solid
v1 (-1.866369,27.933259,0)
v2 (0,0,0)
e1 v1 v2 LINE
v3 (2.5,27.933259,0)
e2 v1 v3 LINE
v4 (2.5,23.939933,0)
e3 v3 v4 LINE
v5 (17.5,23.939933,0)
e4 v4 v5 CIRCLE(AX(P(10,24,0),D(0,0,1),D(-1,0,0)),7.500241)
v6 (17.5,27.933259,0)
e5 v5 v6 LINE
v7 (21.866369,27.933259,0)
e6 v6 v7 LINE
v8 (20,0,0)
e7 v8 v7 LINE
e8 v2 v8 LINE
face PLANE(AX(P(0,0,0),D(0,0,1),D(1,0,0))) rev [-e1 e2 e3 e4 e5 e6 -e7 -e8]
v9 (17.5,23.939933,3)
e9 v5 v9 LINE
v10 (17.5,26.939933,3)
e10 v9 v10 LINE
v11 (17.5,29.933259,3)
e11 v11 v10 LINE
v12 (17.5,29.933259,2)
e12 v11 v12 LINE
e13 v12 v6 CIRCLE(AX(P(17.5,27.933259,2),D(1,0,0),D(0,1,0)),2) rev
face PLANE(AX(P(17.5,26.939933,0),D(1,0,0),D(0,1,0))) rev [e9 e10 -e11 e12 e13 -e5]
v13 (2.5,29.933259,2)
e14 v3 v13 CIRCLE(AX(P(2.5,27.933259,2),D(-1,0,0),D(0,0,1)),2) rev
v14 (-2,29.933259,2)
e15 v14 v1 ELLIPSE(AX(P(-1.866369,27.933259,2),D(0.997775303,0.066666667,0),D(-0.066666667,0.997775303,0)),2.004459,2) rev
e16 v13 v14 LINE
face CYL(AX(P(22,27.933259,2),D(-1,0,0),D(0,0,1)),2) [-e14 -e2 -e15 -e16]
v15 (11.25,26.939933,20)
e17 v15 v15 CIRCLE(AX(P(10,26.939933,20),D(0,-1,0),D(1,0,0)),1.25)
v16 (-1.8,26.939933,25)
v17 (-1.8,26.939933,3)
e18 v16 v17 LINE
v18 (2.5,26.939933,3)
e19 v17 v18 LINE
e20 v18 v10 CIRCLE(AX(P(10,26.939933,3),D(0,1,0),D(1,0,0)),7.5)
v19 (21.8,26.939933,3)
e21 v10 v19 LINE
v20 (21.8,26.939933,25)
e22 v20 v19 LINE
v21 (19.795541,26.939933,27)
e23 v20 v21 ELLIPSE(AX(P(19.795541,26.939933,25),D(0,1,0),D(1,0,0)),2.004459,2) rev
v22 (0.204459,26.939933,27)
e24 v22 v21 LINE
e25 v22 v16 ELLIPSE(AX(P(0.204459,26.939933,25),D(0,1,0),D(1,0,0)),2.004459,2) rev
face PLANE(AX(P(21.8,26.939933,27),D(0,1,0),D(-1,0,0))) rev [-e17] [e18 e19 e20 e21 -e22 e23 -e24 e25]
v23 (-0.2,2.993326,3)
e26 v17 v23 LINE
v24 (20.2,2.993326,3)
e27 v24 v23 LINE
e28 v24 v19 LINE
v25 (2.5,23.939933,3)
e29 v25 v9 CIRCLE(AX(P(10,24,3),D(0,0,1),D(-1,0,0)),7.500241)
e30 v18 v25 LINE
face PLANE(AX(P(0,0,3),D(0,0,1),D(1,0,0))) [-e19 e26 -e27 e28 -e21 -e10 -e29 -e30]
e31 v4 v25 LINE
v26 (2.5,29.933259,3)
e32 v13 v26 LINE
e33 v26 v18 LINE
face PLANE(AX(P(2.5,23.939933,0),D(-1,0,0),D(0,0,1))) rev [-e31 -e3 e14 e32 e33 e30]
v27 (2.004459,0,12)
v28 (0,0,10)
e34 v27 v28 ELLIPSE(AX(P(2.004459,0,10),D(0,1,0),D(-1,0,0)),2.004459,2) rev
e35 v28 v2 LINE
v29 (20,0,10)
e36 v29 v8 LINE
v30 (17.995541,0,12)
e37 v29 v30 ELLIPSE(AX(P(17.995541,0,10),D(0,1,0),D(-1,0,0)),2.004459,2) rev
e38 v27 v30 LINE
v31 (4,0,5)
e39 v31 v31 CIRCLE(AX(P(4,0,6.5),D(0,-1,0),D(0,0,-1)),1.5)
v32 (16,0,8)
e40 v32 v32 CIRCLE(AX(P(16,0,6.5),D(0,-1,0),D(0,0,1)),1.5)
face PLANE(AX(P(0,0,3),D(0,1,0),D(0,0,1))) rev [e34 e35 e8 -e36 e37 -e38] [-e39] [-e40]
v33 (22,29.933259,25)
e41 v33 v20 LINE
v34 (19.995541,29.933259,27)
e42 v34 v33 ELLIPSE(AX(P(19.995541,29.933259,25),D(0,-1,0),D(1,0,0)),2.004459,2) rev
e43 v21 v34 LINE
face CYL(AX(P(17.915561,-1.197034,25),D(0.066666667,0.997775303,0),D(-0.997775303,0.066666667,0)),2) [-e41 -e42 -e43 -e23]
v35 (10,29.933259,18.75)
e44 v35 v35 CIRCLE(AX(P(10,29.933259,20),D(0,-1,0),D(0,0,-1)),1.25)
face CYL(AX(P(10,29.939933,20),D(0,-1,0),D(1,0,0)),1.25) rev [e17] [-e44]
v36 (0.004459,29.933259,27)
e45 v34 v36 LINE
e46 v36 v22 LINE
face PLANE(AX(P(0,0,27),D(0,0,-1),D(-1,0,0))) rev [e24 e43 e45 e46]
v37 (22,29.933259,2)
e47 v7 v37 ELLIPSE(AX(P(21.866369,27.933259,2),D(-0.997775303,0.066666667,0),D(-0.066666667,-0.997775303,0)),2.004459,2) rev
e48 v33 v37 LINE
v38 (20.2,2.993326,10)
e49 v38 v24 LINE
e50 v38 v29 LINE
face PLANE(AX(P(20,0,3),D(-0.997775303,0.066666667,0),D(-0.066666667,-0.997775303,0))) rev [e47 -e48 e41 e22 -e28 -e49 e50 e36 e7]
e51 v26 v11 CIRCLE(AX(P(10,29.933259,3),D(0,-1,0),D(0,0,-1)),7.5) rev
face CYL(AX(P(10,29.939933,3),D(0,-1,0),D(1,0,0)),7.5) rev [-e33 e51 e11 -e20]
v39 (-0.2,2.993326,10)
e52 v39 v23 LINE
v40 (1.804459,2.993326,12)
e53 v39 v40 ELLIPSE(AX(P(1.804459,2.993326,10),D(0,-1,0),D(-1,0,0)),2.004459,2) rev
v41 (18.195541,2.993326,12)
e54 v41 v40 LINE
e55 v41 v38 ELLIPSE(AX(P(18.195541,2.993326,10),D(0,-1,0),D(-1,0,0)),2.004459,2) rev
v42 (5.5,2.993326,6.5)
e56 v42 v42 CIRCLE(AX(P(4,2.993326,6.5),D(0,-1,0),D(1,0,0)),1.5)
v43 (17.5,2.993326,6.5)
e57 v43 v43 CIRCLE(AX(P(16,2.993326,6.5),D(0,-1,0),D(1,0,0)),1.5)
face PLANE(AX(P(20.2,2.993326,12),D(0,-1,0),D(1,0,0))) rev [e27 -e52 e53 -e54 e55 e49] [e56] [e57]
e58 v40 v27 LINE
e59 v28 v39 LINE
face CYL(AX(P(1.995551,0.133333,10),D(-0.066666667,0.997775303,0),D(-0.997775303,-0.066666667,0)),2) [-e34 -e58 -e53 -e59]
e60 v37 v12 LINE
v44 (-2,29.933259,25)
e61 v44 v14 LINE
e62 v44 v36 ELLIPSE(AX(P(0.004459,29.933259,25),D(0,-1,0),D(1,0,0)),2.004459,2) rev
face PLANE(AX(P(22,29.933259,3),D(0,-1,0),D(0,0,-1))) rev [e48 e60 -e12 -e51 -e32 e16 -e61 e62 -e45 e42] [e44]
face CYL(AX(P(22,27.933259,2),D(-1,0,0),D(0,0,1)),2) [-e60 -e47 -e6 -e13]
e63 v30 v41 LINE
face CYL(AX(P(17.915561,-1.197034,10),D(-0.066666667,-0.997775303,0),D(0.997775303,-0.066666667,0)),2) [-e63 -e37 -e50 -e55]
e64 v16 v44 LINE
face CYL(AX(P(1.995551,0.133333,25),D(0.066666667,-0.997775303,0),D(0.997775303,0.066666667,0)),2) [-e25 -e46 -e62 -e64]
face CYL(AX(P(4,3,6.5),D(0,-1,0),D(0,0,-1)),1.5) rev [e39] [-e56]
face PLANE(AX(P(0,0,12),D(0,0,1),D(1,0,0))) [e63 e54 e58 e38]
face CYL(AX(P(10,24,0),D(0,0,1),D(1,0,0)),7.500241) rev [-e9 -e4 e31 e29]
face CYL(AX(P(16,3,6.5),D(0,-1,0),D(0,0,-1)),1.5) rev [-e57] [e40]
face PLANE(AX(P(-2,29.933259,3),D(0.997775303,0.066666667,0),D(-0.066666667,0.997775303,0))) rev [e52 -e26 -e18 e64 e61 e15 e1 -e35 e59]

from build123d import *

# Parameters (mm, degrees)
SALIENTE_EXTRUIR1_DEPTH      = 3
SALIENTE_EXTRUIR2_DEPTH      = 9
SALIENTE_EXTRUIR3_DEPTH      = 24
CORTAR_EXTRUIR1_DEPTH        = 3
CORTAR_EXTRUIR_L_MINA1_START = -2.993325909
CORTAR_EXTRUIR_L_MINA1_DEPTH = 2.993325909
REDONDEO1_R                  = 2
CROQUIS6_R                   = 1.25
CORTAR_EXTRUIR2_DEPTH        = 3
CROQUIS7_R                   = 1.5
CORTAR_EXTRUIR3_DEPTH        = 3


# Read off the part's stored shape, not the designer's step: Cortar-Extruir-Lámina1
with BuildPart() as part:
    # Croquis1 → Saliente-Extruir1 (new body)
    with BuildSketch(Plane.XY):
        Polygon((0, 0), (20, 0), (22, 29.933259094), (-2, 29.933259094), align=None)
    extrude(amount=SALIENTE_EXTRUIR1_DEPTH)

    # Croquis2 → Saliente-Extruir2 (add)
    with BuildSketch(Plane.XY.offset(3)):
        Polygon((0, 0), (20, 0), (20.2, 2.993325909), (-0.2, 2.993325909), align=None)
    extrude(amount=SALIENTE_EXTRUIR2_DEPTH)

    # Croquis3 → Saliente-Extruir3 (add)
    with BuildSketch(Plane.XY.offset(3)):
        Polygon((22, 29.933259094), (21.8, 26.939933185), (-1.8, 26.939933185), (-2, 29.933259094), align=None)
    extrude(amount=SALIENTE_EXTRUIR3_DEPTH)

    # Croquis4 → Cortar-Extruir1 (cut)
    with BuildSketch(Plane.XY.offset(3)):
        with BuildLine():
            Line((17.5, 26.939933185), (17.5, 23.939933185))
            ThreePointArc((17.5, 23.939933185), (10, 16.499759469), (2.5, 23.939933185))
            Line((2.5, 23.939933185), (2.5, 26.939933185))
            Line((2.5, 26.939933185), (17.5, 26.939933185))
        make_face()
    extrude(amount=-CORTAR_EXTRUIR1_DEPTH, mode=Mode.SUBTRACT)

    # Cortar-Extruir-Lámina1 outline → Cortar-Extruir-Lámina1 (cut)
    with BuildSketch(Plane.XZ.offset(-26.939933185).offset(CORTAR_EXTRUIR_L_MINA1_START)):
        with BuildLine():
            Line((2.5, 0), (17.5, 0))
            Line((17.5, 0), (17.5, 3))
            ThreePointArc((17.5, 3), (10, 10.5), (2.5, 3))
            Line((2.5, 3), (2.5, 0))
        make_face()
    extrude(amount=CORTAR_EXTRUIR_L_MINA1_DEPTH, mode=Mode.SUBTRACT)

    # Redondeo1
    redondeo1_edges = [part.edges().sort_by_distance(p)[0] for p in [
        (-0.1, 1.496662955, 12),
        (20.1, 1.496662955, 12),
        (-1.9, 28.436596139, 27),
        (21.9, 28.436596139, 27),
        (19.75, 29.933259094, 0),
        (0.25, 29.933259094, 0),
    ]]
    fillet(redondeo1_edges, radius=REDONDEO1_R)

    # Croquis6 → Cortar-Extruir2 (cut)
    with BuildSketch(Plane.XZ.offset(-26.939933185)):
        with Locations((10, 20)):
            Circle(CROQUIS6_R)
    extrude(amount=-CORTAR_EXTRUIR2_DEPTH, mode=Mode.SUBTRACT)

    # Croquis7 → Cortar-Extruir3 (cut)
    with BuildSketch(Plane.XZ):
        with Locations(Location((4, 6.5, 0), (0, 0, 270))):
            Circle(CROQUIS7_R)
        with Locations((16, 6.5)):
            Circle(CROQUIS7_R)
    extrude(amount=-CORTAR_EXTRUIR3_DEPTH, mode=Mode.SUBTRACT)


solid = part.part
